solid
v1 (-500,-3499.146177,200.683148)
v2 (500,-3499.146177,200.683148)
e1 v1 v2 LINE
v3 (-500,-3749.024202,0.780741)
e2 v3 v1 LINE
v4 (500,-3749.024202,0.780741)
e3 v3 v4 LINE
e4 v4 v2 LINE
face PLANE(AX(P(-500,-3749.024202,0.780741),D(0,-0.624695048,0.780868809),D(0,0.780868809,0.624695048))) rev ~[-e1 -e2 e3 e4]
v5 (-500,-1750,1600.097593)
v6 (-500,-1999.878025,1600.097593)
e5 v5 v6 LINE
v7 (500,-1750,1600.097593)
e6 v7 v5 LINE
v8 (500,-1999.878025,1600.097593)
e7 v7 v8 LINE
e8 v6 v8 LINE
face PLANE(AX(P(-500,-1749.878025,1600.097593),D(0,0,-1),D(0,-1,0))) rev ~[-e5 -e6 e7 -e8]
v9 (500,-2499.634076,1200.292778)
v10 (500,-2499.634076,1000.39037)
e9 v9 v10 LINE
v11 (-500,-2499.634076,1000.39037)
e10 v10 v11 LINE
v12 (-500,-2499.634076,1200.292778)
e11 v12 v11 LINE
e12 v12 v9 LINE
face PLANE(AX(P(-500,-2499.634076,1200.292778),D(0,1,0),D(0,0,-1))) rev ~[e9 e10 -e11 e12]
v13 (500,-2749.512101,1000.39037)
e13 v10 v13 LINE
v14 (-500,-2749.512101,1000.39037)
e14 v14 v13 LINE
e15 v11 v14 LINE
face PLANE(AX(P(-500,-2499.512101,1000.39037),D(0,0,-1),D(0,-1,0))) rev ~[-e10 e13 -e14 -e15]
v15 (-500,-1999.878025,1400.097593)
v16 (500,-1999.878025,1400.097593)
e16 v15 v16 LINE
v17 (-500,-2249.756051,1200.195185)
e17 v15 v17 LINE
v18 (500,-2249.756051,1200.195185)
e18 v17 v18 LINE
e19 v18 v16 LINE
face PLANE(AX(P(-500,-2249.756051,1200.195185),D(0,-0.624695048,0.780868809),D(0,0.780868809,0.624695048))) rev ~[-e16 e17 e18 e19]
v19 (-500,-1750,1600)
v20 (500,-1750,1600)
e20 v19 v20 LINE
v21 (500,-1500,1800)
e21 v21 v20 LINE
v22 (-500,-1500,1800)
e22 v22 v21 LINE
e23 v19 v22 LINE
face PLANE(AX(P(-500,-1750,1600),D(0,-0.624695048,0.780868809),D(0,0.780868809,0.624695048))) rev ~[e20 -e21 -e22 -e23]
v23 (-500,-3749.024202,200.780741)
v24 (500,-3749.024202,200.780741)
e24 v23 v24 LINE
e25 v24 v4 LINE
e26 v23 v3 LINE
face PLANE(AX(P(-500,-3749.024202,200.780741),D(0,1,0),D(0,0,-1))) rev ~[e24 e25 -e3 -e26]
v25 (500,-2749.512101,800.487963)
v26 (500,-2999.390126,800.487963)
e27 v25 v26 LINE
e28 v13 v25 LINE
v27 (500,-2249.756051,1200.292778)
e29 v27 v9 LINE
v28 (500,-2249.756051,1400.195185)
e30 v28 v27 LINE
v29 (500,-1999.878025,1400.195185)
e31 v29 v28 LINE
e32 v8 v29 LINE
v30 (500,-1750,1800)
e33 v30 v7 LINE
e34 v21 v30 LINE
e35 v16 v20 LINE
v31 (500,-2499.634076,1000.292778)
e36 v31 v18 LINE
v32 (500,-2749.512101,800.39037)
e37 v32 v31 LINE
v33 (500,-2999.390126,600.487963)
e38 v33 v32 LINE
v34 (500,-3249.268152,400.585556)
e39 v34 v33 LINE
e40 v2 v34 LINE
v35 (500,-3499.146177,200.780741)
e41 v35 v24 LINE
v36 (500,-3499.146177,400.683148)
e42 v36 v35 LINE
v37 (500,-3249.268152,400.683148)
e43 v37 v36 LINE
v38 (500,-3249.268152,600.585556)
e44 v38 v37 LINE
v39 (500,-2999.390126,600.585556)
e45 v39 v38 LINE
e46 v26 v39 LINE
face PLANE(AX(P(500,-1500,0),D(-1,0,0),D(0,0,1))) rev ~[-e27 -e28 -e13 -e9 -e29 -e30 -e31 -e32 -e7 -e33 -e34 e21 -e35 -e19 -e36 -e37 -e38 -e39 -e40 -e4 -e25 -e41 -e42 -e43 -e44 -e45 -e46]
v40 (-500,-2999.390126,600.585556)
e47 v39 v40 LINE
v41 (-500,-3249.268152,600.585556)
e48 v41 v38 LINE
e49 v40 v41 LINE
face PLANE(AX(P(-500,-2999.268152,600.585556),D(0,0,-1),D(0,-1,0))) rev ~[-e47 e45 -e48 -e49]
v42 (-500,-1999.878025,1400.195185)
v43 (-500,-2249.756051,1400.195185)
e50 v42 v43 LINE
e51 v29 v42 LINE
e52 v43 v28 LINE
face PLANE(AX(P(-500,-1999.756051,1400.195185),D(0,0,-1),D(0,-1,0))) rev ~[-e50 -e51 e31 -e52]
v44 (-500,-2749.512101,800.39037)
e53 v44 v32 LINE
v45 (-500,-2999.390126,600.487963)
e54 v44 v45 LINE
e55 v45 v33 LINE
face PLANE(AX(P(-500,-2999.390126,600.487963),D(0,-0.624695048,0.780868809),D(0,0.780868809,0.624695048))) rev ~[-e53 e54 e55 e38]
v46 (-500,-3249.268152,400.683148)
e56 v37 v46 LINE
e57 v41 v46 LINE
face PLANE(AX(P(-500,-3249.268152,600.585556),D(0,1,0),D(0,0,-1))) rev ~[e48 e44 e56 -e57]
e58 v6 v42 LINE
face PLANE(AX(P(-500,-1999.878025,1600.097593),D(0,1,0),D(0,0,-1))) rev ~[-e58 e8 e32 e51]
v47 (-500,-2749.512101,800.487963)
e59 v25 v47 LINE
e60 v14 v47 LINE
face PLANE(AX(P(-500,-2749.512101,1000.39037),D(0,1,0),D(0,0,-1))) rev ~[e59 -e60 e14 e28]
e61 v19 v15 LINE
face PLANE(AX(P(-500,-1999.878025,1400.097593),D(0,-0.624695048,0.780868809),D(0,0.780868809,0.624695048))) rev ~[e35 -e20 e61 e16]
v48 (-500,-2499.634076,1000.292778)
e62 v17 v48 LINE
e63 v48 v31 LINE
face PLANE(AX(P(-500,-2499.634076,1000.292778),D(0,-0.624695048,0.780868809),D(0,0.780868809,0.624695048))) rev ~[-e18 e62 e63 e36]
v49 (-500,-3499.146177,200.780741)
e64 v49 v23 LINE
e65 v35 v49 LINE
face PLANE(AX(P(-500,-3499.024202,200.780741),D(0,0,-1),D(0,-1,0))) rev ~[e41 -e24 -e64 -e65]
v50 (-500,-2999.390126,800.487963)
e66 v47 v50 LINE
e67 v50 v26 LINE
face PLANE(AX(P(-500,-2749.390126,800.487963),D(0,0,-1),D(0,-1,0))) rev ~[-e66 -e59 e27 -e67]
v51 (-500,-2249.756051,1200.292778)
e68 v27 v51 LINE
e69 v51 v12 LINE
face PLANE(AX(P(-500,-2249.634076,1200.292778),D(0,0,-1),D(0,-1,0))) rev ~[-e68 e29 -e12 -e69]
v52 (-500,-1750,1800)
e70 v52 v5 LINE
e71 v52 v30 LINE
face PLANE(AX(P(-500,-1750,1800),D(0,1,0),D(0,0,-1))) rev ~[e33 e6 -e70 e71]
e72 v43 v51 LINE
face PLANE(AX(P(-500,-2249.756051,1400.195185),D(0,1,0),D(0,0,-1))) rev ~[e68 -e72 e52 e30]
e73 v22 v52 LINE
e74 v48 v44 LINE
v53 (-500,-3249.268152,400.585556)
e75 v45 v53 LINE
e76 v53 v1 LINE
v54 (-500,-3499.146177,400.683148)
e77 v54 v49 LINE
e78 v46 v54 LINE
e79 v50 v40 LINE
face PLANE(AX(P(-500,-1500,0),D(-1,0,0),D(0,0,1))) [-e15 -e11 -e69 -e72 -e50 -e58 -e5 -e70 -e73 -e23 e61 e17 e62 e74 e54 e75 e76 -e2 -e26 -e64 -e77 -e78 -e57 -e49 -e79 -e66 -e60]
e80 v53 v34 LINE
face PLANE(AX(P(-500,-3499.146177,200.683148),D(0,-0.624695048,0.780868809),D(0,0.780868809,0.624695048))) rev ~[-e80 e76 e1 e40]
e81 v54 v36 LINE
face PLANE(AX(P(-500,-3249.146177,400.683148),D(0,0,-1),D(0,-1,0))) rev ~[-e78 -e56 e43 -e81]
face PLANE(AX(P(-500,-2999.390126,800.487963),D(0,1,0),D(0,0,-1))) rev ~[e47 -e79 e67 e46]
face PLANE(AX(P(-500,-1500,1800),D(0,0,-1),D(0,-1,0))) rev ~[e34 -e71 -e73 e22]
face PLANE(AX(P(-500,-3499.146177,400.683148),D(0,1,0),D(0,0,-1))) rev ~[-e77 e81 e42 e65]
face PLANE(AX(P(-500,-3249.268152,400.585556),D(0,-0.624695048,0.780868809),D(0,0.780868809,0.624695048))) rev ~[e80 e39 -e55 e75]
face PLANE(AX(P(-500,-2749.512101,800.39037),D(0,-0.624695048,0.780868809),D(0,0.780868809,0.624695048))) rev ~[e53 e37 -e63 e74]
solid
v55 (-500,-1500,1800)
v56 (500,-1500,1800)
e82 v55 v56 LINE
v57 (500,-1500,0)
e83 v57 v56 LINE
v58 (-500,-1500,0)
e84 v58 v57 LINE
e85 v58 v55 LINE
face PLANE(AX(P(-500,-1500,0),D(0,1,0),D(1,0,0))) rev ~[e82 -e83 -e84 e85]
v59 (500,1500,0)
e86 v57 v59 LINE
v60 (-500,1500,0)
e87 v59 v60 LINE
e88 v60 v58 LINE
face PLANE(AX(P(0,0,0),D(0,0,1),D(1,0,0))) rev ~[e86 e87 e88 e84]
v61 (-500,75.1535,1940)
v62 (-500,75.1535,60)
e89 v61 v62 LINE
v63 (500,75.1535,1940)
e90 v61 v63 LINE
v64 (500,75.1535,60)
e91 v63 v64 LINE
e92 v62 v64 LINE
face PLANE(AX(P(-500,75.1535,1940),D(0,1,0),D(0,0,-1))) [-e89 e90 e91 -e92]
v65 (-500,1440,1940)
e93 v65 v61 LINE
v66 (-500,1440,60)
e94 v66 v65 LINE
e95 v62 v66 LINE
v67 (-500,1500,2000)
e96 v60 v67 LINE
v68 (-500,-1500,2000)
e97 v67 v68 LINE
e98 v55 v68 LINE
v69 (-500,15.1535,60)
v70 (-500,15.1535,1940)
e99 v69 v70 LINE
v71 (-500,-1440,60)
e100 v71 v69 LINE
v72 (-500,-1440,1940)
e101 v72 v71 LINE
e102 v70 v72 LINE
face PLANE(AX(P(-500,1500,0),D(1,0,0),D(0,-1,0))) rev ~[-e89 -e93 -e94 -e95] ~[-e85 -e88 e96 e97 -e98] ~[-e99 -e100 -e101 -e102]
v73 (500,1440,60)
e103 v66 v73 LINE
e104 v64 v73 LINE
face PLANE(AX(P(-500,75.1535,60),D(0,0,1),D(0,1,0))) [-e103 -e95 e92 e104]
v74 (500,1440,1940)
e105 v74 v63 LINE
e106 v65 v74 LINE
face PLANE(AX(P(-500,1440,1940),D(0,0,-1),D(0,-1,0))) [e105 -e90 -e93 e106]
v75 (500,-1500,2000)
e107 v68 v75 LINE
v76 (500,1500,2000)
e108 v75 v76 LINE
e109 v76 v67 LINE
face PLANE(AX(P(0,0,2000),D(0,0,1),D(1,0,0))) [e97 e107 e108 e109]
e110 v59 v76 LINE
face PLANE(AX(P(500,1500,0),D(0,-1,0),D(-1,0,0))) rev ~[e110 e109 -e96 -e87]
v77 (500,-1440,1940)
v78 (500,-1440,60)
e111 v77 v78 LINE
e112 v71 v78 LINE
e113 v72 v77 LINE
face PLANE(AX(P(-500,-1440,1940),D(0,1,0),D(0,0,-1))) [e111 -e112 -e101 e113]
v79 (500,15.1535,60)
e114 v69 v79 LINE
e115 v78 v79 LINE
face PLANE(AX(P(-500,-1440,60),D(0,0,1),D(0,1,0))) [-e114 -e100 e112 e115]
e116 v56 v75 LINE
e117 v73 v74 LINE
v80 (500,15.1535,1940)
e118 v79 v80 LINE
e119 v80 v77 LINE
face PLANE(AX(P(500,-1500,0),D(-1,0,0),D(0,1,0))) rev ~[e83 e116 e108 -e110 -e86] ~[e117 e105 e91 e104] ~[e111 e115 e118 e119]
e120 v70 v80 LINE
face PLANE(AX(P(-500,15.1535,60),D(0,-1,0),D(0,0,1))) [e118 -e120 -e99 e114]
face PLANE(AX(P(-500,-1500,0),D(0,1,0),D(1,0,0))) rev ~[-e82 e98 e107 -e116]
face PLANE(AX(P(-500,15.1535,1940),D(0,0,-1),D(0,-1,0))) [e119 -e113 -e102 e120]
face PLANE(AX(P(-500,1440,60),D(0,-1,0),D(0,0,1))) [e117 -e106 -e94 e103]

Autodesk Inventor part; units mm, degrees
ref_plane "YZ Plane" through (0, 0, 0) normal (1, 0, 0) x (0, 1, 0)
ref_plane "XZ Plane" through (0, 0, 0) normal (0, 1, 0) x (-1, 0, 0)
ref_plane "XY Plane" through (0, 0, 0) normal (0, 0, 1) x (1, 0, 0)
sketch "Sketch1" plane through (0, 0, 0) normal (0, 0, 1) x (1, 0, 0)
  line L0 (500, 1500) -> (-500, 1500)
  line L1 (-500, 1500) -> (-500, -1500)
  line L2 (-500, -1500) -> (500, -1500)
  line L3 (500, -1500) -> (500, 1500)
  line L4 (500, 1500) -> (-500, -1500) construction
  line L5 (-500, 1500) -> (500, -1500) construction
  point P0 (0, 0)
  dimension "d0" = 1000
  dimension "d1" = 3000
extrude "Extrusion1" add sketch "Sketch1" along normal blind 2000
sketch "Sketch2" plane through (-500, -1500, 0) normal (-1, 0, 0) x (0, 0, 1)
  line L0 (0, 3000) -> (0, 0) projected
  line L1 (0, 0) -> (2000, 0) projected
  line L2 (2000, 3000) -> (2000, 0) projected
  line L3 (0, 3000) -> (2000, 3000) projected
  line L4 (1800, 0) -> (1800, -250)
  line L5 (1800, -250) -> (1600, -250)
  line L6 (1600, -250) -> (1800, 0)
  point P0 (0, 1500)
  dimension "d4" = 250
  dimension "d5" = 200
  dimension "d6" = 200
  dimension "d7" = 51.34
extrude "Extrusion2" add sketch "Sketch2" against normal up to surface (1000 mm away) contours L4 L5 L6
pattern_linear "Rectangular Pattern1" count 9 spacing 320 along (0, -0.7808688, -0.624695) of "Extrusion2"
sketch "Sketch3" plane through (-500, -1500, 0) normal (-1, 0, 0) x (0, 0, 1)
  line L0 (0, 3000) -> (0, 0) projected
  line L1 (0, 0) -> (1800, 0) projected
  line L2 (1800, 0) -> (2000, 0) projected
  line L3 (2000, 3000) -> (2000, 0) projected
  line L4 (0, 3000) -> (2000, 3000) projected
  line L5 (1940, 60) -> (1800, 60)
  line L6 (1800, 60) -> (60, 60)
  line L7 (60, 60) -> (60, 2940)
  line L8 (60, 2940) -> (1940, 2940)
  line L9 (1940, 2940) -> (1940, 60)
  line L10 (1940, 1575.1535) -> (60, 1575.1535)
  line L11 (60, 1575.1535) -> (60, 1515.1535)
  line L12 (60, 1515.1535) -> (1940, 1515.1535)
  line L13 (1940, 1515.1535) -> (1940, 1575.1535)
  point P0 (0, 1500)
  dimension "d13" = 60
  dimension "d14" = 60
extrude "Extrusion3" cut sketch "Sketch3" against normal through all contours L5 L6 L7 L12 L9 | L10 L7 L8 L9
equation "\"d6\" = d5"
equation "\"d14\" = d13"
properties part number "BSH 03 upstairs"
